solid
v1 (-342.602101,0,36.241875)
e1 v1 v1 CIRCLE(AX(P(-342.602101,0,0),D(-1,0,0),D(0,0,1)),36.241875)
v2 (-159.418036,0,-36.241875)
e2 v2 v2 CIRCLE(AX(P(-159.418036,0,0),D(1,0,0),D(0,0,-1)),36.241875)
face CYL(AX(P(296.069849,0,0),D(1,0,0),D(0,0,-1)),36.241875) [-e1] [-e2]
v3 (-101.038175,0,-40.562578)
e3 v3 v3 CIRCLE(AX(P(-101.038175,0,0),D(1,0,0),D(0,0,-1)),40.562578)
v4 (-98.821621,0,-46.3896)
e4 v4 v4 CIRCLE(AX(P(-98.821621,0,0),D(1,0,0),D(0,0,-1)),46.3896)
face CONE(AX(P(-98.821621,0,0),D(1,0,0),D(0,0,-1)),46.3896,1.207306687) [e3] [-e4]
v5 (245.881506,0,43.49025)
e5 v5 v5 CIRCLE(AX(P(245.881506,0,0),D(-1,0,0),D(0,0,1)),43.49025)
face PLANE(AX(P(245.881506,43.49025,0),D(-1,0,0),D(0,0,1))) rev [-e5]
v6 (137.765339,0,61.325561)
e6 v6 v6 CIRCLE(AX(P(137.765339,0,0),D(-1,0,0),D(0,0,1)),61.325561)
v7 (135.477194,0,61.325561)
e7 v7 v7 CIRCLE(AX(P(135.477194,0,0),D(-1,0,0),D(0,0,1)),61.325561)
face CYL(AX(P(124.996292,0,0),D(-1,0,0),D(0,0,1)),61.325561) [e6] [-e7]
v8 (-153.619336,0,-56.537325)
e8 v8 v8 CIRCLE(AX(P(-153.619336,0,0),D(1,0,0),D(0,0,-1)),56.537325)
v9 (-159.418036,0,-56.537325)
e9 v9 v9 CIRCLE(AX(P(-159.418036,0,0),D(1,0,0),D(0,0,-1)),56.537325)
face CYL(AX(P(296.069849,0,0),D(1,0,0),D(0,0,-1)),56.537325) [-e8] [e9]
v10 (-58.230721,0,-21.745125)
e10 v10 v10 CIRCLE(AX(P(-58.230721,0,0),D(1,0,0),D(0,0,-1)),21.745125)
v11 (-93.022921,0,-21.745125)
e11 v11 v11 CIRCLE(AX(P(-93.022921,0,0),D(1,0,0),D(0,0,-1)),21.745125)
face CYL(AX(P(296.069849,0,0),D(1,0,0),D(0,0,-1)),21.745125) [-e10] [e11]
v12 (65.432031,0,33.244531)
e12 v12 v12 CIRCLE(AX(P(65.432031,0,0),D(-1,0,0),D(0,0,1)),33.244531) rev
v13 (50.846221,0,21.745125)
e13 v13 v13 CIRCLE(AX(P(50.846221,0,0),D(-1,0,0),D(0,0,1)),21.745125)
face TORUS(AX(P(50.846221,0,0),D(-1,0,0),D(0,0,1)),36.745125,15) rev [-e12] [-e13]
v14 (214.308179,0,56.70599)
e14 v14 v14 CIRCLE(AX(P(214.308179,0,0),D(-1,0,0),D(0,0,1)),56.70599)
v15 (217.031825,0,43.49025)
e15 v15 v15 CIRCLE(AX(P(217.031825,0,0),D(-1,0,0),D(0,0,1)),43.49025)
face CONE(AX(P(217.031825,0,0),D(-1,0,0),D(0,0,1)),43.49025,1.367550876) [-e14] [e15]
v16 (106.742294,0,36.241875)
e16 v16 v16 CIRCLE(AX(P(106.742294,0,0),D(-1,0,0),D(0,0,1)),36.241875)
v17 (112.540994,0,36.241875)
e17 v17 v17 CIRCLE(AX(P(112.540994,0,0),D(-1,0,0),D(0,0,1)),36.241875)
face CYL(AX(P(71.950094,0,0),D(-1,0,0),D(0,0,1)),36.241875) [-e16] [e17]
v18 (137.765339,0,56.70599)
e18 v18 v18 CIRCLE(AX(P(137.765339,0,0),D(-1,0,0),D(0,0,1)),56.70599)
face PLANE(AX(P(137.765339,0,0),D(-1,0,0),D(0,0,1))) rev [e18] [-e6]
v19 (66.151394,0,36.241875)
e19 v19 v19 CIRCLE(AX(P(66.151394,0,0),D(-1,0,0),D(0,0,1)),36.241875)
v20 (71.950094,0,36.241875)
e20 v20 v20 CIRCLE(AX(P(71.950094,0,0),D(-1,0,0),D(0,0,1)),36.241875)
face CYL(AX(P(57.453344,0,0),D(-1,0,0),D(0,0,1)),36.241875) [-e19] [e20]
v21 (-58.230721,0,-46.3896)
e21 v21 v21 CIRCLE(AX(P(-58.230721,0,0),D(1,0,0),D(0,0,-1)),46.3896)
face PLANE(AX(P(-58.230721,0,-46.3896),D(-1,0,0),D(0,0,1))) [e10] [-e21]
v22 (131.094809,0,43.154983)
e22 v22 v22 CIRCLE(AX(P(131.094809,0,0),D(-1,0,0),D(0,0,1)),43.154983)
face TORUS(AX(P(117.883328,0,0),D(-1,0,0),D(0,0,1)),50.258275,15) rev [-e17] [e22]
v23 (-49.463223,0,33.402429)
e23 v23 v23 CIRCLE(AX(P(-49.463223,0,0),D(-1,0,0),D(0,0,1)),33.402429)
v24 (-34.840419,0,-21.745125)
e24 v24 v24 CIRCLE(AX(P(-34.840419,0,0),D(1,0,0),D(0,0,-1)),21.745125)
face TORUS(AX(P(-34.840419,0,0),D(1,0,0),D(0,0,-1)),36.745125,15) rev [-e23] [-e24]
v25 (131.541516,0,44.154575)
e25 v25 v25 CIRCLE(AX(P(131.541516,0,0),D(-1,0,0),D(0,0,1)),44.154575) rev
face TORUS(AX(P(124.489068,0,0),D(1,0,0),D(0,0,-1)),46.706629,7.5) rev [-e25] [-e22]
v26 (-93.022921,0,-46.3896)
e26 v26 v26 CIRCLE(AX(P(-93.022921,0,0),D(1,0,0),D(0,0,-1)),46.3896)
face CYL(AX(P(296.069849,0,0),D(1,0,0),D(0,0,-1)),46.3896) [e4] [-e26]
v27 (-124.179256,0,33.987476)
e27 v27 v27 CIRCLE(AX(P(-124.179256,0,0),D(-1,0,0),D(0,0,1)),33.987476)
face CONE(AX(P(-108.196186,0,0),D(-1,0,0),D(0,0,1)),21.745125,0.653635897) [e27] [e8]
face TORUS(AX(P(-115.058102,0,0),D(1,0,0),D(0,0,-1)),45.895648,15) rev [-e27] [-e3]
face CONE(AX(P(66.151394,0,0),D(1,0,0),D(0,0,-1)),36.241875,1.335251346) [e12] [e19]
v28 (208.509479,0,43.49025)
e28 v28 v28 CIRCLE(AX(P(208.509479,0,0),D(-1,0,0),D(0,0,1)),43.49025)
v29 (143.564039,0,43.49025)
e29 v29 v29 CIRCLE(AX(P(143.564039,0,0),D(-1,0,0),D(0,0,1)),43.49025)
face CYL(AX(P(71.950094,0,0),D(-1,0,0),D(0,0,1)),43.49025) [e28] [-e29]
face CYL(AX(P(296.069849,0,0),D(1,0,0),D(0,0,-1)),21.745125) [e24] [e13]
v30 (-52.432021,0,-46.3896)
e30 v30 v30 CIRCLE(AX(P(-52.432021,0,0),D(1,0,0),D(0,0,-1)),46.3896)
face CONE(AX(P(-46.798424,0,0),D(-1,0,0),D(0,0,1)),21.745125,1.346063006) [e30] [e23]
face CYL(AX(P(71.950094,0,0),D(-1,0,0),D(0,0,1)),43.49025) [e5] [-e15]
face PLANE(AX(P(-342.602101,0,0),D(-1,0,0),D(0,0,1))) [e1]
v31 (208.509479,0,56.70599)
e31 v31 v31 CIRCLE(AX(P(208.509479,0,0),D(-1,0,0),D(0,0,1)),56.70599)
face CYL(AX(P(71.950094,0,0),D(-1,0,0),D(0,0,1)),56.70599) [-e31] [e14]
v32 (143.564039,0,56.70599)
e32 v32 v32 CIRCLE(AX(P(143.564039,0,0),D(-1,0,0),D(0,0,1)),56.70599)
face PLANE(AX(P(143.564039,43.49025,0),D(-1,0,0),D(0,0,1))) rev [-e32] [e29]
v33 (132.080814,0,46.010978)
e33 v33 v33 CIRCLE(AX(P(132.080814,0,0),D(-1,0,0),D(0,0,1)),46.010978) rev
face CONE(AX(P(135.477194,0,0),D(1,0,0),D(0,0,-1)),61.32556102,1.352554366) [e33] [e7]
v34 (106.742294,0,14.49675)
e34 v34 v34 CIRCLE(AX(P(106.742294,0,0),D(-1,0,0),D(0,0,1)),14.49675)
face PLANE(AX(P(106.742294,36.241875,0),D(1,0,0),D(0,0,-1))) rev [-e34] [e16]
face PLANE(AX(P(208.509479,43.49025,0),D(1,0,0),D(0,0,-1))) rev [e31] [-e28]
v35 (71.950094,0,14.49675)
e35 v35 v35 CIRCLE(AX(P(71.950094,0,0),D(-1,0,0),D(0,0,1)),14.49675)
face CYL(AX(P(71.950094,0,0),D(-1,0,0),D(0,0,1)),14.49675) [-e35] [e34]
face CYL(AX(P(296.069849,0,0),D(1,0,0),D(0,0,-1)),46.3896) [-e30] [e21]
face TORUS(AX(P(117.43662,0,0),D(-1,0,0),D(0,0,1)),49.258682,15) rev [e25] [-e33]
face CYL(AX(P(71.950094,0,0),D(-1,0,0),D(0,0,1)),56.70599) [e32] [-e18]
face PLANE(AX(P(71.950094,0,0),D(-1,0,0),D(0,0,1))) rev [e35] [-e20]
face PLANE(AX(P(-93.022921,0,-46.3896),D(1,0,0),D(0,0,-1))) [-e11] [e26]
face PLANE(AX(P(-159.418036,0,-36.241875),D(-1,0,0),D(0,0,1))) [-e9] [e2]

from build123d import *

# Parameters (mm, degrees)
SKETCH5_W           = 12
SKETCH5_H           = 16.095925532
SKETCH10_R          = 12.5
BOSS_EXTRUDE3_DEPTH = 52
SKETCH11_R          = 12.5
CUT_EXTRUDE3_DEPTH  = 109
SCALE1_SCALE        = 1.9329
SKETCH13_R          = 24.16125
BOSS_EXTRUDE4_DEPTH = 5
FILLET1_R           = 10
FILLET2_R           = 10
FILLET4_R           = 5
SCALE2_SCALE        = 1.5
SKETCH15_R          = 36.241875
BOSS_EXTRUDE5_DEPTH = 60


with BuildPart() as part:
    # Sketch1 → Revolve1 (revolve)
    with BuildSketch(Plane(origin=(0, 0, 0), x_dir=(1, 0, 0), z_dir=(0, 1, 0))):
        Polygon((-97.333333333, 12.5), (-57.433333333, 12.5), (-57.433333333, 19.5), (-55.433333333, 19.5), (-39.766666667, 7.5), (-36.533333333, 16), (-34.533333333, 16), (-34.533333333, 7.5), (-22.533333333, 7.5), (-22.533333333, 16), (-20.533333333, 16), (-18.590278059, 7.5), (5.366666667, 7.5), (5.366666667, 0), (-97.333333333, 0), align=None)
    revolve(axis=Axis((99.666666667, 0, 0), (-1, 0, 0)))

    # Sketch2 → Revolve2 (revolve)
    with BuildSketch(Plane.XY, mode=Mode.PRIVATE) as revolve2_sk:
        Polygon((5.366666667, 0), (80.644631229, 0), (80.644631229, 8.695124825), (66.612224209, 8.695124825), (55.795033147, 23.11804624), (52.466666667, 23.11804624), (52.466666667, 12.5), (5.366666667, 12.5), align=None)
    revolve(revolve2_sk.sketch.rotate(Axis((5.366666667, 0, 0), (1, 0, 0)), 90), axis=Axis((5.366666667, 0, 0), (1, 0, 0)))

    # Sketch3 → Cut-Revolve1 (revolve, cut)
    with BuildSketch(Plane.XY, mode=Mode.PRIVATE) as cut_revolve1_sk:
        Polygon((-1.866722484, 7.5), (24.866666667, 7.5), (24.866666667, 12.5), (24.866666667, 26.008660159), (-1.866722484, 26.008660159), align=None)
    revolve(cut_revolve1_sk.sketch.rotate(Axis((-112.967867012, 0, 0), (1, 0, 0)), 270), axis=Axis((-112.967867012, 0, 0), (1, 0, 0)), mode=Mode.SUBTRACT)

    # Sketch4 → Revolve3 (revolve)
    with BuildSketch(Plane.XY, mode=Mode.PRIVATE) as revolve3_sk:
        Polygon((22.366666667, 0), (22.366666667, 12.5), (20.366666667, 12.5), (17.366666667, 0), align=None)
    revolve(revolve3_sk.sketch.rotate(Axis((17.366666667, 0, 0), (1, 0, 0)), 270), axis=Axis((17.366666667, 0, 0), (1, 0, 0)))

    # Sketch5 → Cut-Revolve2 (revolve, cut)
    with BuildSketch(Plane.XY, mode=Mode.PRIVATE) as cut_revolve2_sk:
        with Locations((28.366666667, 13.047962766)):
            Rectangle(SKETCH5_W, SKETCH5_H)
    revolve(cut_revolve2_sk.sketch.rotate(Axis((-109.042031517, 0, 0), (1, 0, 0)), 90), axis=Axis((-109.042031517, 0, 0), (1, 0, 0)), mode=Mode.SUBTRACT)

    # Sketch10 → Boss-Extrude3 (add)
    with BuildSketch(Plane.ZY.offset(-34.366666667)):
        with Locations(Location((0, 0, 0), (0, 0, 180))):
            Circle(SKETCH10_R)
    extrude(amount=-BOSS_EXTRUDE3_DEPTH)

    # Sketch11 → Cut-Extrude3 (cut)
    with BuildSketch(Plane(origin=(22.366666667, 0, 0), x_dir=(0, 0, -1), z_dir=(1, 0, 0))):
        Circle(SKETCH11_R)
    extrude(amount=CUT_EXTRUDE3_DEPTH, mode=Mode.SUBTRACT)


with BuildPart() as body_2:
    # of the pieces the cut leaves, the one that is kept (cut_extrude3_keep)
    add(part.part.solids().sort_by_distance((22.366666667, 0, -12.5))[0])

    # Sketch12 → Revolve6 (revolve)
    with BuildSketch(Plane.XY, mode=Mode.PRIVATE) as revolve6_sk:
        Polygon((22.366666667, 5), (34.366666667, 5), (34.366666667, 12.5), (36.366666667, 12.5), (37.912349785, 5), (45.066666667, 19.558173299), (47.066666667, 19.558173299), (47.066666667, 15), (69.466666667, 15), (69.466666667, 19.558173299), (71.466666667, 19.558173299), (72.406065536, 15), (82.356461942, 15), (82.356461942, 0), (22.366666667, 0), align=None)
    revolve(revolve6_sk.sketch.rotate(Axis((22.366666667, 0, 0), (1, 0, 0)), 90), axis=Axis((22.366666667, 0, 0), (1, 0, 0)))


with BuildPart() as body_2_1:
    # Scale1: scaled about (-3.323692934, 0, 0)
    add(body_2.part.scale(SCALE1_SCALE).moved(Location((3.100673138, 0, 0))))

    # Sketch13 → Boss-Extrude4 (add)
    with BuildSketch(Plane.ZY.offset(185.034926862)):
        with Locations(Location((0, 0, 0), (0, 0, 180))):
            Circle(SKETCH13_R)
    extrude(amount=BOSS_EXTRUDE4_DEPTH)

    # Fillet1
    fillet1_edges = [body_2_1.edges().sort_by_distance(p)[0] for p in [
        (-73.764316862, 0, 14.49675),
    ]]
    fillet(fillet1_edges, radius=FILLET1_R)

    # Fillet2
    # the kernel refuses this fillet: 10 mm, written as the material it adds along each edge
    with BuildSketch(Plane(origin=(40.147923138, 0, 0), x_dir=(0, 0, -1), z_dir=(0, -1, 0))) as fillet2_piece_1:
        with BuildLine():
            CenterArc((14.49675 + FILLET2_R, -FILLET2_R * 0.788396810575), FILLET2_R, 103.495733281, 76.504266719)
            Line((14.49675 + FILLET2_R * 0.766627047525, FILLET2_R * 0.183990491406), (14.49675 + FILLET2_R * 0.761959588475, FILLET2_R * 0.203438237446))
            Line((14.49675 + FILLET2_R * 0.761959588475, FILLET2_R * 0.203438237446), (14.49675 - FILLET2_R * 0.02, FILLET2_R * 0.0157679362115))
            Line((14.49675 - FILLET2_R * 0.02, FILLET2_R * 0.0157679362115), (14.49675 - FILLET2_R * 0.02, -FILLET2_R * 0.788396810575))
            Line((14.49675 - FILLET2_R * 0.02, -FILLET2_R * 0.788396810575), (14.49675, -FILLET2_R * 0.788396810575))
        make_face()
    revolve(axis=Axis((40.147923138, 0, 0), (1, 0, 0)))
    with BuildSketch(Plane(origin=(76.381454038, 0, 0), x_dir=(0, 0, 1), z_dir=(0, 1, 0))) as fillet2_piece_2:
        with BuildLine():
            CenterArc((33.505516614, 0.573905142), FILLET2_R, 116.170866586, 84.693418733)
            Line((29.095020982, 9.548732621), (29.00681107, 9.728229171))
            Line((29.00681107, 9.728229171), (9.576290087, 0.17949655))
            Line((9.576290087, 0.17949655), (9.624130193, -0.195883329))
            ThreePointArc((9.624130193, -0.195883329), (16.872505193, -1.689708779), (23.974364668, -3.058882021))
            Line((23.974364668, -3.058882021), (24.16125, -2.9876509))
        make_face()
    revolve(axis=Axis((76.381454038, 0, 0), (1, 0, 0)))
    with BuildSketch(Plane(origin=(-32.832475321, 0, 0), x_dir=(0, 0, -1), z_dir=(0, 1, 0))) as fillet2_piece_3:
        with BuildLine():
            CenterArc((14.49675 + FILLET2_R, -FILLET2_R * 0.79720034578), FILLET2_R, 102.876270786, 77.123729214)
            Line((14.49675, -FILLET2_R * 0.79720034578), (14.49675 - FILLET2_R * 0.02, -FILLET2_R * 0.79720034578))
            Line((14.49675 - FILLET2_R * 0.02, -FILLET2_R * 0.79720034578), (14.49675 - FILLET2_R * 0.02, FILLET2_R * 0.0159440069156))
            Line((14.49675 - FILLET2_R * 0.02, FILLET2_R * 0.0159440069156), (14.49675 + FILLET2_R * 0.772696675376, FILLET2_R * 0.197150295903))
            Line((14.49675 + FILLET2_R * 0.772696675376, FILLET2_R * 0.197150295903), (14.49675 + FILLET2_R * 0.777153603309, FILLET2_R * 0.177653224497))
        make_face()
    revolve(axis=Axis((-32.832475321, 0, 0), (-1, 0, 0)))

    # Sketch14 → Revolve7 (revolve)
    with BuildSketch(Plane.XY, mode=Mode.PRIVATE) as revolve7_sk:
        Polygon((90.210033138, 0), (90.210033138, 40.883707347), (88.684603111, 40.883707347), (81.69733558, 9.377482841), (81.69733558, 0), align=None)
    revolve(revolve7_sk.sketch.rotate(Axis((81.69733558, 0, 0), (1, 0, 0)), 90), axis=Axis((81.69733558, 0, 0), (1, 0, 0)))

    # Fillet3: read off the stored shape, not the designer's step
    # Fillet3 outline → Fillet3 (revolve)
    with BuildSketch(Plane.YX):
        with BuildLine():
            Line((29.614165238, 86.185309499), (29.095020982, 85.930186659))
            ThreePointArc((29.095020982, 85.930186659), (29.874355922, 86.207955574), (30.673985231, 86.420350223))
            Line((30.673985231, 86.420350223), (29.614165238, 86.420350223))
            Line((29.614165238, 86.420350223), (29.614165238, 86.185309499))
        make_face()
    revolve(axis=Axis((0, 0, 0), (1, 0, 0)))

    # Fillet4
    # the kernel refuses this fillet: 5 mm, written as the material it adds along each edge
    with BuildSketch(Plane(origin=(85.930186659, 0, 0), x_dir=(0, 1, 0), z_dir=(0, 0, -1))) as fillet4_piece_1:
        with BuildLine():
            CenterArc((31.137752518, -4.571000373), FILLET4_R, 109.893555323, 8.371610668)
            ThreePointArc((29.4363836, 0.130631663), (29.265105411, 0.066875579), (29.095020982, 0))
            ThreePointArc((29.095020982, 0), (28.931740857, -0.082101501), (28.769988422, -0.167173266))
        make_face()
    fillet4_piece_1_solid = revolve(axis=Axis((85.930186659, 0, 0), (1, 0, 0)), revolution_arc=90, mode=Mode.PRIVATE)
    with BuildSketch(Plane(origin=(85.930186659, 0, 0), x_dir=(0, 0, 1), z_dir=(0, 1, 0))) as fillet4_piece_2:
        with BuildLine():
            CenterArc((31.137752518, -4.571000373), FILLET4_R, 109.893555323, 8.371610668)
            ThreePointArc((29.4363836, 0.130631663), (29.265105411, 0.066875579), (29.095020982, 0))
            ThreePointArc((29.095020982, 0), (28.931740857, -0.082101501), (28.769988422, -0.167173266))
        make_face()
    fillet4_piece_2_solid = revolve(axis=Axis((85.930186659, 0, 0), (1, 0, 0)), revolution_arc=270, mode=Mode.PRIVATE)
    add([fillet4_piece_1_solid, fillet4_piece_2_solid])


with BuildPart() as body_2_2:
    # Scale2: scaled about (-4.900577652, 0, 5.1e-08)
    add(body_2_1.part.scale(SCALE2_SCALE).moved(Location((2.450288826, 0, -2.6e-08))))

    # Sketch15 → Boss-Extrude5 (add)
    with BuildSketch(Plane.ZY.offset(282.602101447)):
        with Locations(Location((0, 0, 0), (0, 0, 180))):
            Circle(SKETCH15_R)
    extrude(amount=BOSS_EXTRUDE5_DEPTH)


solid = body_2_2.part
